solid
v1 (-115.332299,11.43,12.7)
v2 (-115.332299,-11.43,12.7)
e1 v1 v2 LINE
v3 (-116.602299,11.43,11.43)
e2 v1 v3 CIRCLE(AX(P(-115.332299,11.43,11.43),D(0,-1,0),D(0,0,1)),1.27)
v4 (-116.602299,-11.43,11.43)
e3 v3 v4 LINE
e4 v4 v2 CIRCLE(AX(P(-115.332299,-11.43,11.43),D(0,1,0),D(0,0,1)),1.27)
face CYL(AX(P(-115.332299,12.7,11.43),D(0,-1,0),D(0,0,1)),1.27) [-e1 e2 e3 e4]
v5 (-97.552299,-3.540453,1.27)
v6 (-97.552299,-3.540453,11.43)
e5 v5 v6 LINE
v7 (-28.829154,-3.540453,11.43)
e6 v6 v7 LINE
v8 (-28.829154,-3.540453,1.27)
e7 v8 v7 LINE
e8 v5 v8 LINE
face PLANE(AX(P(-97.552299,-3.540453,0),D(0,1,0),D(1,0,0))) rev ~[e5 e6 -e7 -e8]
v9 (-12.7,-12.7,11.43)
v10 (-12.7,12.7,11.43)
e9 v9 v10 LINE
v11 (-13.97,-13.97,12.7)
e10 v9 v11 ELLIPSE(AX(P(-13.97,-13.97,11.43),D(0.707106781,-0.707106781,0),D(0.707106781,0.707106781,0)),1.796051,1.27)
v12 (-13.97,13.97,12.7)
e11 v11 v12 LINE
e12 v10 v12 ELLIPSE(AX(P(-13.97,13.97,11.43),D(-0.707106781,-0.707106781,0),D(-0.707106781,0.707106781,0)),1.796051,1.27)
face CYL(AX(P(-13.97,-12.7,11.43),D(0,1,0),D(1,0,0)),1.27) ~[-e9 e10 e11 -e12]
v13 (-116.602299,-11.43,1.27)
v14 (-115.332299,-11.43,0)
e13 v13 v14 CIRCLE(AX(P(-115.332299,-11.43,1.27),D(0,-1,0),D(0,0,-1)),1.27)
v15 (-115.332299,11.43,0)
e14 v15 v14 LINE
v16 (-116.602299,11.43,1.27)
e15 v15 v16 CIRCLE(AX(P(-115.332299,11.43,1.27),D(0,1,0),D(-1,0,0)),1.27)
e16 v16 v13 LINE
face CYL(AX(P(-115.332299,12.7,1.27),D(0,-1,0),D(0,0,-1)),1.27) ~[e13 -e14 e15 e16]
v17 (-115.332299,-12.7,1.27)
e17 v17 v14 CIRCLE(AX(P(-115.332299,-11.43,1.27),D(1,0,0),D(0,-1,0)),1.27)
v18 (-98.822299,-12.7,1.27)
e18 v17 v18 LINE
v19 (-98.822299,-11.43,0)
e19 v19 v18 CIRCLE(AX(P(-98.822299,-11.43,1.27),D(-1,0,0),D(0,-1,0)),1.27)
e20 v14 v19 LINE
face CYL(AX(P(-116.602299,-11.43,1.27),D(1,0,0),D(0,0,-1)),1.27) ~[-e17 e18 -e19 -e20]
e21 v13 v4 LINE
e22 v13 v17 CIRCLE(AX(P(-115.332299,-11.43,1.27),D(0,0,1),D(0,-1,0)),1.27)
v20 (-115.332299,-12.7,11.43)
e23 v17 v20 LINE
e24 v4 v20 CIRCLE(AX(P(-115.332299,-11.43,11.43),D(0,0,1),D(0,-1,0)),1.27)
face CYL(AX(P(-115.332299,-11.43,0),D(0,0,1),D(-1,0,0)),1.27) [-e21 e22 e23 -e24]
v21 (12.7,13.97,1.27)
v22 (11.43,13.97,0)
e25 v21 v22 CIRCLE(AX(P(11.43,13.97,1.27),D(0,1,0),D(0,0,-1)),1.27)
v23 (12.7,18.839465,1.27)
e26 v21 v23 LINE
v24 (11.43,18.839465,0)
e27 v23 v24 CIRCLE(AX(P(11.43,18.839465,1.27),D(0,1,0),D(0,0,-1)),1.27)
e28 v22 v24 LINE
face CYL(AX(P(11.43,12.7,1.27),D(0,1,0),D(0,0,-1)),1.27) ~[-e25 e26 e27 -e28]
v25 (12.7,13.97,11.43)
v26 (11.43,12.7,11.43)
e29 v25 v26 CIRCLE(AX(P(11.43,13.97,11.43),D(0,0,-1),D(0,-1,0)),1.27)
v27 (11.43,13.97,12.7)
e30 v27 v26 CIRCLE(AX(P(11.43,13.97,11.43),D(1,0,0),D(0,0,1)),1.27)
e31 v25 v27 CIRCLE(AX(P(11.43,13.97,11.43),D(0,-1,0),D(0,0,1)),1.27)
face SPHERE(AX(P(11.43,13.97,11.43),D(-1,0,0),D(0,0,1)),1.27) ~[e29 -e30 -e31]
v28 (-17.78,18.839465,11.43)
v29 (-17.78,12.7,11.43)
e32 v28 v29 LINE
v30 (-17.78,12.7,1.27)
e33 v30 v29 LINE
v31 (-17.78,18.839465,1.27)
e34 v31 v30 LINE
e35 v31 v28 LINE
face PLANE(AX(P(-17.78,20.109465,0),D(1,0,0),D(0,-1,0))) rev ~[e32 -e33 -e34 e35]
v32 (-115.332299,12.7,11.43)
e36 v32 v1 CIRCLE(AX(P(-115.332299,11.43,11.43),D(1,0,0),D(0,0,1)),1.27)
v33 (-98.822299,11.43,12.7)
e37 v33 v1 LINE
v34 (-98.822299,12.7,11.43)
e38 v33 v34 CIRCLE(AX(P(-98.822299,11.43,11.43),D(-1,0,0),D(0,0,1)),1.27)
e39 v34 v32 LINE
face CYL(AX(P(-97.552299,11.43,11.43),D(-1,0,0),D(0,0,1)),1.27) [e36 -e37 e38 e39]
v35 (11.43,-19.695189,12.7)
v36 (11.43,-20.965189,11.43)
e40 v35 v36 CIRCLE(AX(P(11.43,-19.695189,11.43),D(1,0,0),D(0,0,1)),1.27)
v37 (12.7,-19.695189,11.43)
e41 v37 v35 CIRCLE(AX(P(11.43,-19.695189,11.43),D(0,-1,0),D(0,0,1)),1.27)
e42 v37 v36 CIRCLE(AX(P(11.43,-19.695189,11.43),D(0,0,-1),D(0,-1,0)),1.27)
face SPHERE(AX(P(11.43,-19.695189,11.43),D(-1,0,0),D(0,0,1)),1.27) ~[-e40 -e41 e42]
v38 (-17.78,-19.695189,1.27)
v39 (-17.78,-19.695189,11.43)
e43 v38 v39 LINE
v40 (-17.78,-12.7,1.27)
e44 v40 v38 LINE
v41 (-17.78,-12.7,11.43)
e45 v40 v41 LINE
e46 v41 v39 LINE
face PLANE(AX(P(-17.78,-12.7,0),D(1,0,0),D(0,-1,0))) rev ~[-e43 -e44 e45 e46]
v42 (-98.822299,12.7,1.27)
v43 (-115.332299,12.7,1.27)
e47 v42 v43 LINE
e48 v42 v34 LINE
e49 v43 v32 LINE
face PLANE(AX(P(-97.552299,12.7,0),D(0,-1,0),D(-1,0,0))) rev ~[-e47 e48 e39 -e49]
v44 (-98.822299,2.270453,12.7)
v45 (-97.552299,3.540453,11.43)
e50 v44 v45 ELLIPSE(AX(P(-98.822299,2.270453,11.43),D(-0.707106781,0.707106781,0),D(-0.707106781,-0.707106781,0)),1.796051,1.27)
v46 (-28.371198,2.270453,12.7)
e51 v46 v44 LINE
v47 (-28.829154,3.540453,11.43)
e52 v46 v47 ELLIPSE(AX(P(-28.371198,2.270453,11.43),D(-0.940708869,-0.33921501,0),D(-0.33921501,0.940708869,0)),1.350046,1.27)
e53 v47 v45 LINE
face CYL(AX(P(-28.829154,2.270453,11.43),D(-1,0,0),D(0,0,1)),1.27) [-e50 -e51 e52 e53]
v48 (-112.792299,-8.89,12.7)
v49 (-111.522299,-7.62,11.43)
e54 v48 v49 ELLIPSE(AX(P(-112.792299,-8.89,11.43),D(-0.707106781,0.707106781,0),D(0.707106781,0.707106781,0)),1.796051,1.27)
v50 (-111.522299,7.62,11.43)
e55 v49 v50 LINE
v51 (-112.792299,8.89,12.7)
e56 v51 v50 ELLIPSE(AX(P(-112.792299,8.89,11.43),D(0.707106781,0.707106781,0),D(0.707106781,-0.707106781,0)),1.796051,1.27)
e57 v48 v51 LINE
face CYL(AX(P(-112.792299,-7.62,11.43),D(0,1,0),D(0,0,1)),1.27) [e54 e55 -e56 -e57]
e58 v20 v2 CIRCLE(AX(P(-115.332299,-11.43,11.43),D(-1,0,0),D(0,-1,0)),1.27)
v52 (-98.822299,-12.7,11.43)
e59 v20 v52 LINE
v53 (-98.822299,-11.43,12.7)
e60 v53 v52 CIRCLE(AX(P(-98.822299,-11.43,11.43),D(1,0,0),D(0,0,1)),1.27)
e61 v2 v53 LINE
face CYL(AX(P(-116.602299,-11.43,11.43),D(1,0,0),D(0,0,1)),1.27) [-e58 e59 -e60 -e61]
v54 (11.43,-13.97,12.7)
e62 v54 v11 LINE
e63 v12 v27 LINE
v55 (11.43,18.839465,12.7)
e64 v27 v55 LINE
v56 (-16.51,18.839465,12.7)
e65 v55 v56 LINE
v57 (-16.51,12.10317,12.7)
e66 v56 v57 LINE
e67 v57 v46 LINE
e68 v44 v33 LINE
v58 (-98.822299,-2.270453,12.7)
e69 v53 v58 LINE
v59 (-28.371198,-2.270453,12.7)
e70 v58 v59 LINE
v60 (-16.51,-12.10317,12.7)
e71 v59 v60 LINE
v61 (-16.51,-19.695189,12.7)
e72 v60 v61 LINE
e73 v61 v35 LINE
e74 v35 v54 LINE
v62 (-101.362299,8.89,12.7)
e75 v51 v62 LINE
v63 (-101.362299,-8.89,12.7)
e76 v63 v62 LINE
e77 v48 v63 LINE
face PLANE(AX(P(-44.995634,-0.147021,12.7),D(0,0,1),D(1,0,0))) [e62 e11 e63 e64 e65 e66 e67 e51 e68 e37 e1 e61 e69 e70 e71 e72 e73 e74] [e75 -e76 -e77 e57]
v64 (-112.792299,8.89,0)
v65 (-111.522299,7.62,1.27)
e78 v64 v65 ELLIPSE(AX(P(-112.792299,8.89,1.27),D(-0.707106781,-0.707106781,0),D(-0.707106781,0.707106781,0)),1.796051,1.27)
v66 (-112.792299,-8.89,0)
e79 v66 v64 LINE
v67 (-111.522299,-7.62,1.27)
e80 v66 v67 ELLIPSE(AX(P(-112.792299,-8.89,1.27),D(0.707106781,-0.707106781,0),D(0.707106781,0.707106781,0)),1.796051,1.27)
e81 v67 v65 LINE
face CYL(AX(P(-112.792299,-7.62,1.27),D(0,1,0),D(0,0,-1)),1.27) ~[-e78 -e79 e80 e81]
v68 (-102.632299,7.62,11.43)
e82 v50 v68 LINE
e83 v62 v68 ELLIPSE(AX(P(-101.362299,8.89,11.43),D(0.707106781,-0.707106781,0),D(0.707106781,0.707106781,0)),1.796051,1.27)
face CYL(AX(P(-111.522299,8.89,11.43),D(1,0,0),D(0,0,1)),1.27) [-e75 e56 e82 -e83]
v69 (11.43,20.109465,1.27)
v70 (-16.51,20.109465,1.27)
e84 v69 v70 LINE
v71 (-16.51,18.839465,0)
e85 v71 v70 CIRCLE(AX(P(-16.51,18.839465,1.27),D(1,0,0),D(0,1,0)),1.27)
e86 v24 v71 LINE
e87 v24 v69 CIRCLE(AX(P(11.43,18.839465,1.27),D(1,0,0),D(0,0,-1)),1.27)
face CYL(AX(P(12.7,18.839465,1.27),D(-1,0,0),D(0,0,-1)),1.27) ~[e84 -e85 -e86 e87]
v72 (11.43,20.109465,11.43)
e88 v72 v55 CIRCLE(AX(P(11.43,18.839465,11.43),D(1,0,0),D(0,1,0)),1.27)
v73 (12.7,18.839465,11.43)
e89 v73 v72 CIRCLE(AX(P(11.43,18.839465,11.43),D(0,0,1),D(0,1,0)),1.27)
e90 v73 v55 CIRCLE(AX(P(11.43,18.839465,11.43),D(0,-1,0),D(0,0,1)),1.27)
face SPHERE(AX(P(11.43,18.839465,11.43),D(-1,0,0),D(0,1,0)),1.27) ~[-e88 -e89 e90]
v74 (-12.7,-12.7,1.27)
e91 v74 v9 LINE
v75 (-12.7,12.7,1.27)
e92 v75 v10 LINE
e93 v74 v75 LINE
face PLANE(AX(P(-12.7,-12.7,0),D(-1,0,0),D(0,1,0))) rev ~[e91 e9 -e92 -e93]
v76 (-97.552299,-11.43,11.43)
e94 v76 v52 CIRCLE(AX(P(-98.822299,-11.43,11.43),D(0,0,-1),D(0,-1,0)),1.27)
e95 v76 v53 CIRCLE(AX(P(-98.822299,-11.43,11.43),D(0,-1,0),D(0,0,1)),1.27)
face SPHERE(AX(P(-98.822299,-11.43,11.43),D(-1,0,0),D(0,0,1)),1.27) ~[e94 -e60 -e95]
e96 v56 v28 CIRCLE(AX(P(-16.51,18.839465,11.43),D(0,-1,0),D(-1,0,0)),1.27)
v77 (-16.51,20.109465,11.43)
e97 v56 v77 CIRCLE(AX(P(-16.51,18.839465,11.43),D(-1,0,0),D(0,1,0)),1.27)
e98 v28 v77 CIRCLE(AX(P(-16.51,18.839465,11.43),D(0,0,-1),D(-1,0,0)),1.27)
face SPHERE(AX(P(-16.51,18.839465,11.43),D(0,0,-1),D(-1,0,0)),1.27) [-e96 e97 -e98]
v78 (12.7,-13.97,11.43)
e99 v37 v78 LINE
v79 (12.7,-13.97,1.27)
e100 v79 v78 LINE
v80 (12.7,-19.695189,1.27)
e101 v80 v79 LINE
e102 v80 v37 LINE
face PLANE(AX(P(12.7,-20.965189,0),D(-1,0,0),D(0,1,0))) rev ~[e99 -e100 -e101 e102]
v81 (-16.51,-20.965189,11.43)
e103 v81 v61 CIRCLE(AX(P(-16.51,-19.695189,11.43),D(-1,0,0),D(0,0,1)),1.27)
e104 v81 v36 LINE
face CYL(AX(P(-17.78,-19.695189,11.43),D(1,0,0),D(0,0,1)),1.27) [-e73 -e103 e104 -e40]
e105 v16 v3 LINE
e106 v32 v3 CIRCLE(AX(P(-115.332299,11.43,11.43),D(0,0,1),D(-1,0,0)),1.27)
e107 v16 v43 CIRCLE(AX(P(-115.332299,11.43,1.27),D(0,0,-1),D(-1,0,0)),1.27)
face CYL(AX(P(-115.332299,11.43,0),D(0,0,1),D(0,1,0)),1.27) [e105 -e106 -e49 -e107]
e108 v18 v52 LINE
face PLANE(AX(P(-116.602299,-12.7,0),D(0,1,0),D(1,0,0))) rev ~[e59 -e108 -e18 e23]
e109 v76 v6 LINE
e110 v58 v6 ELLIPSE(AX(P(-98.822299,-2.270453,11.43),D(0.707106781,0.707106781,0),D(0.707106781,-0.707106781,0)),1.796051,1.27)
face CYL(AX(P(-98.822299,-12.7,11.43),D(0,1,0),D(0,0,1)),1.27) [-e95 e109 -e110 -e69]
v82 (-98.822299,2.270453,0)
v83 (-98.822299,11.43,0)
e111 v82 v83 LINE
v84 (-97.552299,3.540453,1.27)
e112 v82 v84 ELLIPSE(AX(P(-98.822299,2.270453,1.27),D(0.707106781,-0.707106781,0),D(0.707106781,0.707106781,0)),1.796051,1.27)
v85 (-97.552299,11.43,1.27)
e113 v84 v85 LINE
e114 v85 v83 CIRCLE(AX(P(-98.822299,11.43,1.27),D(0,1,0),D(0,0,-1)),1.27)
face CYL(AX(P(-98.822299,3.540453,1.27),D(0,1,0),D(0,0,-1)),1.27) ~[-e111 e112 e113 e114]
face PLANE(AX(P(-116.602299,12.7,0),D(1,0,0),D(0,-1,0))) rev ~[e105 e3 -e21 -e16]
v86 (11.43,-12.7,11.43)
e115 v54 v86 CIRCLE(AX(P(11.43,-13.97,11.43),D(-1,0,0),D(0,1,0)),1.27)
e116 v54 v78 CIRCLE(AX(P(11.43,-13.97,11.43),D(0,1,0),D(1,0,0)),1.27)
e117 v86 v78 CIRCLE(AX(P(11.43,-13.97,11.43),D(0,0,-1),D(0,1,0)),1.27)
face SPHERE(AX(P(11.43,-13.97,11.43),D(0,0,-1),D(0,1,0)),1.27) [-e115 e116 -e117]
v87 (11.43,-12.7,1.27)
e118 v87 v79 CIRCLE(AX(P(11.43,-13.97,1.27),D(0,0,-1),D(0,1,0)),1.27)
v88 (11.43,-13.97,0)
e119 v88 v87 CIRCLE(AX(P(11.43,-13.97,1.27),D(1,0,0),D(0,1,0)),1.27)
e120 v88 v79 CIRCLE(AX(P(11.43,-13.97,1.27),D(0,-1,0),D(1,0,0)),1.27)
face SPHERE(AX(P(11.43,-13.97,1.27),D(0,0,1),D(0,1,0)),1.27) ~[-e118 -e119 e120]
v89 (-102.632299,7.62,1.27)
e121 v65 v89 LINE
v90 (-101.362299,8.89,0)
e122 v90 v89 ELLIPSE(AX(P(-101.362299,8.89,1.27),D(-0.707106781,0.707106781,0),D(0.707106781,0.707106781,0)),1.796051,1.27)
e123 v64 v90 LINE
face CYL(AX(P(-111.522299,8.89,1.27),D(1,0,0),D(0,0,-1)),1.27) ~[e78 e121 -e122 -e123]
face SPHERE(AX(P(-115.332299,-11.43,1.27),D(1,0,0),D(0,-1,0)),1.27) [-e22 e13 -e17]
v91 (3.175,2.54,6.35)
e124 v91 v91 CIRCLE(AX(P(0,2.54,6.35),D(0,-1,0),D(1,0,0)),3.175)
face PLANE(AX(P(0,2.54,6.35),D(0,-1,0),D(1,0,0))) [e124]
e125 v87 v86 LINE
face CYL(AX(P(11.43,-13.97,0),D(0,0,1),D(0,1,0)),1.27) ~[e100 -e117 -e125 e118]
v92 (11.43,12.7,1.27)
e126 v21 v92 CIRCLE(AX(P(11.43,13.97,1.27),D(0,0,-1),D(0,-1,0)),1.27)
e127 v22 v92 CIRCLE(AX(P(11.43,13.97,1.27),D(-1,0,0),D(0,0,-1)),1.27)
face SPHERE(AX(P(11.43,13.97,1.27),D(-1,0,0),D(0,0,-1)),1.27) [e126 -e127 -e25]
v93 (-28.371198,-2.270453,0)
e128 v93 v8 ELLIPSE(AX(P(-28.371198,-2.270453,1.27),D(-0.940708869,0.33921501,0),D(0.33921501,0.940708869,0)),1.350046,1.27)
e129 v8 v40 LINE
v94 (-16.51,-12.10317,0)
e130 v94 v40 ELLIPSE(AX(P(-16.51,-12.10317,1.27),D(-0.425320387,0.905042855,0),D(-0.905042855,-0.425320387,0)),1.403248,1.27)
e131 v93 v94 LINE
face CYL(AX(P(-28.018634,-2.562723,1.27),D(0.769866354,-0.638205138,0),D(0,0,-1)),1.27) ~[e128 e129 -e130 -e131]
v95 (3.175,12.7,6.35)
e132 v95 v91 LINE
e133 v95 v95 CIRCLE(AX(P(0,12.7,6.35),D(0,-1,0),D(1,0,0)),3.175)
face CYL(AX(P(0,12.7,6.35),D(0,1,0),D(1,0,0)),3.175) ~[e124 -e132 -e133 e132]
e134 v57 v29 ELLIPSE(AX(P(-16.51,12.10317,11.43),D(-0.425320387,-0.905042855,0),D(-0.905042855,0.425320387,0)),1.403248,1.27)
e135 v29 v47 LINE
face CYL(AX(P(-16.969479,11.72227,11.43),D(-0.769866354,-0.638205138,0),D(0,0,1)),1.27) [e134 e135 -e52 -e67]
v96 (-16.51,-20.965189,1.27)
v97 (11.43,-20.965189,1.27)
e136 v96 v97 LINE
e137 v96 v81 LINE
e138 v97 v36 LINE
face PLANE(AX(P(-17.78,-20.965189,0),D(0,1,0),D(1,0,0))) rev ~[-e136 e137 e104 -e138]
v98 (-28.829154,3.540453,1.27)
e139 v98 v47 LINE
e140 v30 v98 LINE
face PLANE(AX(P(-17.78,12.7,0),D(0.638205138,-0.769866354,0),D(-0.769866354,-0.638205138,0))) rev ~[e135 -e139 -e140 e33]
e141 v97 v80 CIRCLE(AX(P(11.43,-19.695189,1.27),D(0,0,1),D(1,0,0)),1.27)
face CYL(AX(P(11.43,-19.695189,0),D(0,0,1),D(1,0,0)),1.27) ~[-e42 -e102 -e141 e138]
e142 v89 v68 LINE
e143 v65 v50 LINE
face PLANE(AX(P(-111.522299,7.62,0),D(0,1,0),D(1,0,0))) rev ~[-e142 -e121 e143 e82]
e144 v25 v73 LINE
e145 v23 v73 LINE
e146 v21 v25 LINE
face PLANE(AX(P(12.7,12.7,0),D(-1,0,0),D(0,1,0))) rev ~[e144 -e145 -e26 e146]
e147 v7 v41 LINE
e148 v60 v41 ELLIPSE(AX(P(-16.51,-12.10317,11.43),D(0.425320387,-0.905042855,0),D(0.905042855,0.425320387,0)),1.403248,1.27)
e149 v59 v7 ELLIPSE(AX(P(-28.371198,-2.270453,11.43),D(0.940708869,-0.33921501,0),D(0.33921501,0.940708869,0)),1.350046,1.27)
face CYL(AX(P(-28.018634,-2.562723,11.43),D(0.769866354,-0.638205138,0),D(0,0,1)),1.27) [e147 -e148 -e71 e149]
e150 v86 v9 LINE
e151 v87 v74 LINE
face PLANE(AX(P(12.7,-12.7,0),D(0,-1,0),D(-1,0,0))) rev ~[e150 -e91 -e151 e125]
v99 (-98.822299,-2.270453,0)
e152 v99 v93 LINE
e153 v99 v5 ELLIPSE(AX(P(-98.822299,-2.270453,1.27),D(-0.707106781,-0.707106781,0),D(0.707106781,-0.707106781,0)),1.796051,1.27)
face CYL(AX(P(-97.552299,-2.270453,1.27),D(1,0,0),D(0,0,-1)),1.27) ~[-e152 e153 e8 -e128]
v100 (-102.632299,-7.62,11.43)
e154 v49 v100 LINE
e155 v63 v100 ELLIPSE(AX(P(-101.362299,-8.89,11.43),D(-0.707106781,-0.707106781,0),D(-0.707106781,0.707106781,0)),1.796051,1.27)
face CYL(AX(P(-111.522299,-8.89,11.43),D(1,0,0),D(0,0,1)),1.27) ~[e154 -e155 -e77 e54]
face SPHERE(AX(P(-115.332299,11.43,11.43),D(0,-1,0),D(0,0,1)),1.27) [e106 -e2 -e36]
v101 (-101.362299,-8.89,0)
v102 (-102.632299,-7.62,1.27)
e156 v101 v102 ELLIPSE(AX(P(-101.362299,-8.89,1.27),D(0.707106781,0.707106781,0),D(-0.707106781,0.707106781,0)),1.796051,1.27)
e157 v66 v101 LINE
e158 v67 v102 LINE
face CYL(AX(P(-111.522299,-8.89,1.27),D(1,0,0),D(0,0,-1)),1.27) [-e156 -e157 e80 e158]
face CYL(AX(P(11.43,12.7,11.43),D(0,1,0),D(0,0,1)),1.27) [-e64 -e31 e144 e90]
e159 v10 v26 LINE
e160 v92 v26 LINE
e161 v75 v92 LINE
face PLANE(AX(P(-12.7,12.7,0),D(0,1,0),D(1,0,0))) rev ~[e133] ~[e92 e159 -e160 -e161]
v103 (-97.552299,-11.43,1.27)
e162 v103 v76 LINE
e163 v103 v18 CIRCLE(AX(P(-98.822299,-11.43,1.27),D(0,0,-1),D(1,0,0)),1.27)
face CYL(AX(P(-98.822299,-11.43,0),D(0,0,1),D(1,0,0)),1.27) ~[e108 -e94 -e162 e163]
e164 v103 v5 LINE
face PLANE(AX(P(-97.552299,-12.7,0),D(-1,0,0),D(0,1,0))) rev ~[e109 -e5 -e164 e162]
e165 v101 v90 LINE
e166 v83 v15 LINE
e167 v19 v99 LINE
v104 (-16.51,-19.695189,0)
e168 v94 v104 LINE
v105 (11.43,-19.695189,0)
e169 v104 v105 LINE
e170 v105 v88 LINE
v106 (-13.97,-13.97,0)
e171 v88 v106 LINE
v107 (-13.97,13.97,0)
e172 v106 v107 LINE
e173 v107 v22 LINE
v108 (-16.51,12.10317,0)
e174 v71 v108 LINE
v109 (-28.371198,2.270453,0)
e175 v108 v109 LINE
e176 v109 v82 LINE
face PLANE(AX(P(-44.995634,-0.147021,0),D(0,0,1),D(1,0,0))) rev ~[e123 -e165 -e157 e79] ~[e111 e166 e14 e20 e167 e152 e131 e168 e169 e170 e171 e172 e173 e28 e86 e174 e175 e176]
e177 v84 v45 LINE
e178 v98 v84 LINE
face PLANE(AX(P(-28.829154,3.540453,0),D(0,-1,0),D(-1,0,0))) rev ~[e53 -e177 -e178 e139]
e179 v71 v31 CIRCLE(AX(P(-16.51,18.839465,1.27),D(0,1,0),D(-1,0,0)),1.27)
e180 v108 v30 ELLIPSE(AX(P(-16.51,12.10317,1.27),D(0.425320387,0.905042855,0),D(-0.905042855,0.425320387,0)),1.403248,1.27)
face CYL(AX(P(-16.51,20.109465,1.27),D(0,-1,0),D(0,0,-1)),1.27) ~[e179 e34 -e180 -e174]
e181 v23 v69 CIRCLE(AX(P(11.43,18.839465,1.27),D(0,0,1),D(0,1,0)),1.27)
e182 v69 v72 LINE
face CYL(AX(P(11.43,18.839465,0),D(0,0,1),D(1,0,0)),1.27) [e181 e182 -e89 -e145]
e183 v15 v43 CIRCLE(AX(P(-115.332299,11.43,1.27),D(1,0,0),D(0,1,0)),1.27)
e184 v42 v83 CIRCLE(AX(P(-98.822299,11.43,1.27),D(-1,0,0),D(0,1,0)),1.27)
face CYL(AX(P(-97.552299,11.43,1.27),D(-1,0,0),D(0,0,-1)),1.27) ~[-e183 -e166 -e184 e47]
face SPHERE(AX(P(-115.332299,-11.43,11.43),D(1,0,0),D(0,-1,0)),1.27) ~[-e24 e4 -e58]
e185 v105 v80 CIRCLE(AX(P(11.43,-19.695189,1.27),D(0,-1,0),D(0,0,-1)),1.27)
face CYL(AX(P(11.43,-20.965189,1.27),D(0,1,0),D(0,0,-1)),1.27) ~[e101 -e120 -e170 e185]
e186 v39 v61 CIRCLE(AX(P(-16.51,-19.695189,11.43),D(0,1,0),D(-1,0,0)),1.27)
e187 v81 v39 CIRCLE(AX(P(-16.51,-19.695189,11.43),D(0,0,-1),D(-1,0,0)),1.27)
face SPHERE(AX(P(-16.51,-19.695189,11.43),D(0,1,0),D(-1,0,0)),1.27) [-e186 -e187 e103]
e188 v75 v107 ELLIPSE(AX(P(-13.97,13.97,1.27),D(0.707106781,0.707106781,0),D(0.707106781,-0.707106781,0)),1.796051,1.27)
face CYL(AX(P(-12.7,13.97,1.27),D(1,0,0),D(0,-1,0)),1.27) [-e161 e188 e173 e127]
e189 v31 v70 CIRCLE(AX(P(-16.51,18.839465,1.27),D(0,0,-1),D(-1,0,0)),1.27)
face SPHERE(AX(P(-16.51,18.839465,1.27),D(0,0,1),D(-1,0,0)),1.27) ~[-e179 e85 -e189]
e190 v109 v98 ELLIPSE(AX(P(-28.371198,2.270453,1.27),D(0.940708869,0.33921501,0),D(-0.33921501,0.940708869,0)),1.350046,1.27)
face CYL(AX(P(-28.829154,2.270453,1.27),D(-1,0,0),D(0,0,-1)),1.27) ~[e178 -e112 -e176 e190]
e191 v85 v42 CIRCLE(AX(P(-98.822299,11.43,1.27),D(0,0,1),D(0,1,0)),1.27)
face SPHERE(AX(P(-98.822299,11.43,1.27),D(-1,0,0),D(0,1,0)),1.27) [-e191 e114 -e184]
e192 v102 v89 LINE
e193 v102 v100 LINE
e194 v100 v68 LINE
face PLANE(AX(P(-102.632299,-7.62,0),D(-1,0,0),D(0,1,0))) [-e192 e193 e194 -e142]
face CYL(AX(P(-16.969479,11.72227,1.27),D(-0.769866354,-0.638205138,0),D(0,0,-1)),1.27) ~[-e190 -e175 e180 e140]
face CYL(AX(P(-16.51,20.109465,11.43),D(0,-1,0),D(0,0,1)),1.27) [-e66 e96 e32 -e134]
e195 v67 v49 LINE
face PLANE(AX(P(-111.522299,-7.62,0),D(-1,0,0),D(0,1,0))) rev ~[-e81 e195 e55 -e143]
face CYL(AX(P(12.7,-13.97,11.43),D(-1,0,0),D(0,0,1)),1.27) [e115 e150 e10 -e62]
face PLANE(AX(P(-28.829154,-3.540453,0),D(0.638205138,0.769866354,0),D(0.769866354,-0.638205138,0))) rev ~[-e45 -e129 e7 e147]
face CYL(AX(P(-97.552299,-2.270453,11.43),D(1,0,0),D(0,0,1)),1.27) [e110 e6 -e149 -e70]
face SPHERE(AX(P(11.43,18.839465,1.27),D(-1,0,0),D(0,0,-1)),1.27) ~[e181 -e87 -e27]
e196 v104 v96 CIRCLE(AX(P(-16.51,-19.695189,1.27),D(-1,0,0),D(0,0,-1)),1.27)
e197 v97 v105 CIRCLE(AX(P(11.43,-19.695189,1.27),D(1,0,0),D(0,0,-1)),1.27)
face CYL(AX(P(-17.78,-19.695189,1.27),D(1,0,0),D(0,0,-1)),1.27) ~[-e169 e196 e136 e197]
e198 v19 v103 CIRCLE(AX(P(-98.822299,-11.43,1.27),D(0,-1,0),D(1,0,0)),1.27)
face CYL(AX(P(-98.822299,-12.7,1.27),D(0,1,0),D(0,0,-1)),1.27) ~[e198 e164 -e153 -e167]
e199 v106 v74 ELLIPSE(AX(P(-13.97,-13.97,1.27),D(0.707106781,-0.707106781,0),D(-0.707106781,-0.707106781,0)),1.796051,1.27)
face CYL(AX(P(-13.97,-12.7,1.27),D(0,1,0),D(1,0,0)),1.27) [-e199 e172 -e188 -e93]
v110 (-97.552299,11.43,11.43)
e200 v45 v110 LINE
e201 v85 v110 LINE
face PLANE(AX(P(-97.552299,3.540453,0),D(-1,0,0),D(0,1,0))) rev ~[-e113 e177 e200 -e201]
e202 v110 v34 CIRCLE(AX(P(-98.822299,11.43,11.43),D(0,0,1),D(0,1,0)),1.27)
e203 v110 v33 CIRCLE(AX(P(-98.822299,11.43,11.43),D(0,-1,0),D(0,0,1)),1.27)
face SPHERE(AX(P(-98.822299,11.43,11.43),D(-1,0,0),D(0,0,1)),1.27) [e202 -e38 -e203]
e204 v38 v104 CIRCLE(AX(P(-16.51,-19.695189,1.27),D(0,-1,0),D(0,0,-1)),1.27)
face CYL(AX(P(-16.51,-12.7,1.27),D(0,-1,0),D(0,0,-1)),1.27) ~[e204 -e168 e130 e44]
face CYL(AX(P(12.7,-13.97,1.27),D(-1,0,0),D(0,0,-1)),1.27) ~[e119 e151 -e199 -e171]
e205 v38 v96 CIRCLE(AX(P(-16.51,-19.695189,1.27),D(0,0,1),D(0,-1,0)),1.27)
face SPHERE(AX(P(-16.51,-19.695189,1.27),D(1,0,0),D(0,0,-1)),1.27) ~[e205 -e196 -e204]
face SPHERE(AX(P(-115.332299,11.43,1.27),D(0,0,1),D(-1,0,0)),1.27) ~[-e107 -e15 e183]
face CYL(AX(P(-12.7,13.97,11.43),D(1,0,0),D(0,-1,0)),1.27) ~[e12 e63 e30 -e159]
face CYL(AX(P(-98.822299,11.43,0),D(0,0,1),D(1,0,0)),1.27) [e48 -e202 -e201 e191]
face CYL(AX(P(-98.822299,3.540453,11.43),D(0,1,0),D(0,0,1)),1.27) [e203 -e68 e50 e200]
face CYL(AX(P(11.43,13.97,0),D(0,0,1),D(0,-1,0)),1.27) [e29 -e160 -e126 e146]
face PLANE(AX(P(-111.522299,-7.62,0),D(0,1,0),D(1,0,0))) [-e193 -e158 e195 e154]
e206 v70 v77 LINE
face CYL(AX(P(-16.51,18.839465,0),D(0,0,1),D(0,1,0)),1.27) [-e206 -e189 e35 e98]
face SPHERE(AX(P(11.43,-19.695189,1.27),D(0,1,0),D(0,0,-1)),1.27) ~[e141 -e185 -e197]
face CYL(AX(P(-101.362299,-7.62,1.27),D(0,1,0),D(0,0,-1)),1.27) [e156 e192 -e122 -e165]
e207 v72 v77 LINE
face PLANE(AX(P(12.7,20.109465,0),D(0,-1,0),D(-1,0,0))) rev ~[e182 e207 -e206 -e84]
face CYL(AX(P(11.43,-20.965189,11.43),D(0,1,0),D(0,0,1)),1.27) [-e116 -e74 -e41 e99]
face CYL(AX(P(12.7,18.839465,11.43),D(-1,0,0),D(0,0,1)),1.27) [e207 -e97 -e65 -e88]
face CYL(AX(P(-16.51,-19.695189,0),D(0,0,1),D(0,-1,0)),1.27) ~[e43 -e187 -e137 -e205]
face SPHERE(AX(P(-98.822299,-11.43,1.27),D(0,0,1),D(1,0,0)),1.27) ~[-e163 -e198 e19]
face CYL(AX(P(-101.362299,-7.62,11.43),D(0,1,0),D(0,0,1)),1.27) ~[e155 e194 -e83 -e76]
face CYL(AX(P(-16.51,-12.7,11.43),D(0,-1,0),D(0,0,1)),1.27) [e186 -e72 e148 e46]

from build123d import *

# Parameters (mm, degrees)
F0_W     = 8.89
F0_H     = 15.24
F1_DEPTH = 12.7
F2_R     = 3.175
F5_DEPTH = 10.16
F6_R     = 1.27


# Not quite as in the source:
# - the program builds the solid bodies; features that only make, move or delete a surface that nothing else refers to are left out


with BuildPart() as f1:
    # F0 (on Top) → F1 (new body)
    with BuildSketch(Plane.XY):
        Polygon((-12.7, 12.7), (12.7, 12.7), (12.7, 20.1094653457), (-17.78, 20.1094653457), (-17.78, 12.7), (-28.8291541207, 3.5404531619), (-97.5522994995, 3.5404531619), (-97.5522994995, 12.7), (-116.6022994995, 12.7), (-116.6022994995, -12.7), (-97.5522994995, -12.7), (-97.5522994995, -3.5404531619), (-28.8291541207, -3.5404531619), (-17.78, -12.7), (-17.78, -20.9651887417), (12.7, -20.9651887417), (12.7, -12.7), (-12.7, -12.7), align=None)
        with Locations((-107.0772994995, 0)):
            Rectangle(F0_W, F0_H, mode=Mode.SUBTRACT)
    extrude(amount=F1_DEPTH)

    # F2 (on face) → F5 (join)
    with BuildSketch(Plane.XZ.offset(-12.7)):
        with Locations((0, 6.35)):
            Circle(F2_R)
    extrude(amount=F5_DEPTH)

    # F6
    f6_edges = [f1.edges().sort_by_distance(p)[0] for p in [
        (-63.190727, -3.540453, 12.7),
        (-63.190727, 3.540453, 12.7),
        (-63.190727, -3.540453, 0),
        (-107.077299, -12.7, 12.7),
        (-97.552299, -8.120227, 12.7),
        (-97.552299, -12.7, 6.35),
        (-97.552299, -8.120227, 0),
        (-107.077299, -12.7, 0),
        (-116.602299, -12.7, 6.35),
        (-116.602299, 0, 12.7),
        (-107.077299, 12.7, 12.7),
        (-97.552299, 8.120227, 12.7),
        (-102.632299, 0, 12.7),
        (-107.077299, 7.62, 12.7),
        (-111.522299, 0, 12.7),
        (-107.077299, -7.62, 12.7),
        (-116.602299, 12.7, 6.35),
        (-116.602299, 0, 0),
        (-111.522299, 0, 0),
        (-107.077299, 7.62, 0),
        (-102.632299, 0, 0),
        (-107.077299, -7.62, 0),
        (-107.077299, 12.7, 0),
        (-97.552299, 12.7, 6.35),
        (-97.552299, 8.120227, 0),
        (-63.190727, 3.540453, 0),
        (-17.78, 20.109465, 6.35),
        (-23.304577, 8.120227, 12.7),
        (-23.304577, 8.120227, 0),
        (-17.78, 16.404733, 0),
        (-17.78, 16.404733, 12.7),
        (-2.54, 20.109465, 12.7),
        (-2.54, 20.109465, 0),
        (0, 12.7, 0),
        (12.7, 16.404733, 0),
        (12.7, 20.109465, 6.35),
        (12.7, -12.7, 6.35),
        (0, -12.7, 0),
        (12.7, -16.832594, 0),
        (-2.54, -20.965189, 0),
        (-17.78, -16.832594, 0),
        (-12.7, 0, 0),
        (-23.304577, -8.120227, 0),
        (-23.304577, -8.120227, 12.7),
        (-12.7, 0, 12.7),
        (0, 12.7, 12.7),
        (12.7, 16.404733, 12.7),
        (12.7, 12.7, 6.35),
        (-17.78, -16.832594, 12.7),
        (-17.78, -20.965189, 6.35),
        (-2.54, -20.965189, 12.7),
        (0, -12.7, 12.7),
        (12.7, -16.832594, 12.7),
        (12.7, -20.965189, 6.35),
    ]]
    fillet(f6_edges, radius=F6_R)


solid = f1.part
